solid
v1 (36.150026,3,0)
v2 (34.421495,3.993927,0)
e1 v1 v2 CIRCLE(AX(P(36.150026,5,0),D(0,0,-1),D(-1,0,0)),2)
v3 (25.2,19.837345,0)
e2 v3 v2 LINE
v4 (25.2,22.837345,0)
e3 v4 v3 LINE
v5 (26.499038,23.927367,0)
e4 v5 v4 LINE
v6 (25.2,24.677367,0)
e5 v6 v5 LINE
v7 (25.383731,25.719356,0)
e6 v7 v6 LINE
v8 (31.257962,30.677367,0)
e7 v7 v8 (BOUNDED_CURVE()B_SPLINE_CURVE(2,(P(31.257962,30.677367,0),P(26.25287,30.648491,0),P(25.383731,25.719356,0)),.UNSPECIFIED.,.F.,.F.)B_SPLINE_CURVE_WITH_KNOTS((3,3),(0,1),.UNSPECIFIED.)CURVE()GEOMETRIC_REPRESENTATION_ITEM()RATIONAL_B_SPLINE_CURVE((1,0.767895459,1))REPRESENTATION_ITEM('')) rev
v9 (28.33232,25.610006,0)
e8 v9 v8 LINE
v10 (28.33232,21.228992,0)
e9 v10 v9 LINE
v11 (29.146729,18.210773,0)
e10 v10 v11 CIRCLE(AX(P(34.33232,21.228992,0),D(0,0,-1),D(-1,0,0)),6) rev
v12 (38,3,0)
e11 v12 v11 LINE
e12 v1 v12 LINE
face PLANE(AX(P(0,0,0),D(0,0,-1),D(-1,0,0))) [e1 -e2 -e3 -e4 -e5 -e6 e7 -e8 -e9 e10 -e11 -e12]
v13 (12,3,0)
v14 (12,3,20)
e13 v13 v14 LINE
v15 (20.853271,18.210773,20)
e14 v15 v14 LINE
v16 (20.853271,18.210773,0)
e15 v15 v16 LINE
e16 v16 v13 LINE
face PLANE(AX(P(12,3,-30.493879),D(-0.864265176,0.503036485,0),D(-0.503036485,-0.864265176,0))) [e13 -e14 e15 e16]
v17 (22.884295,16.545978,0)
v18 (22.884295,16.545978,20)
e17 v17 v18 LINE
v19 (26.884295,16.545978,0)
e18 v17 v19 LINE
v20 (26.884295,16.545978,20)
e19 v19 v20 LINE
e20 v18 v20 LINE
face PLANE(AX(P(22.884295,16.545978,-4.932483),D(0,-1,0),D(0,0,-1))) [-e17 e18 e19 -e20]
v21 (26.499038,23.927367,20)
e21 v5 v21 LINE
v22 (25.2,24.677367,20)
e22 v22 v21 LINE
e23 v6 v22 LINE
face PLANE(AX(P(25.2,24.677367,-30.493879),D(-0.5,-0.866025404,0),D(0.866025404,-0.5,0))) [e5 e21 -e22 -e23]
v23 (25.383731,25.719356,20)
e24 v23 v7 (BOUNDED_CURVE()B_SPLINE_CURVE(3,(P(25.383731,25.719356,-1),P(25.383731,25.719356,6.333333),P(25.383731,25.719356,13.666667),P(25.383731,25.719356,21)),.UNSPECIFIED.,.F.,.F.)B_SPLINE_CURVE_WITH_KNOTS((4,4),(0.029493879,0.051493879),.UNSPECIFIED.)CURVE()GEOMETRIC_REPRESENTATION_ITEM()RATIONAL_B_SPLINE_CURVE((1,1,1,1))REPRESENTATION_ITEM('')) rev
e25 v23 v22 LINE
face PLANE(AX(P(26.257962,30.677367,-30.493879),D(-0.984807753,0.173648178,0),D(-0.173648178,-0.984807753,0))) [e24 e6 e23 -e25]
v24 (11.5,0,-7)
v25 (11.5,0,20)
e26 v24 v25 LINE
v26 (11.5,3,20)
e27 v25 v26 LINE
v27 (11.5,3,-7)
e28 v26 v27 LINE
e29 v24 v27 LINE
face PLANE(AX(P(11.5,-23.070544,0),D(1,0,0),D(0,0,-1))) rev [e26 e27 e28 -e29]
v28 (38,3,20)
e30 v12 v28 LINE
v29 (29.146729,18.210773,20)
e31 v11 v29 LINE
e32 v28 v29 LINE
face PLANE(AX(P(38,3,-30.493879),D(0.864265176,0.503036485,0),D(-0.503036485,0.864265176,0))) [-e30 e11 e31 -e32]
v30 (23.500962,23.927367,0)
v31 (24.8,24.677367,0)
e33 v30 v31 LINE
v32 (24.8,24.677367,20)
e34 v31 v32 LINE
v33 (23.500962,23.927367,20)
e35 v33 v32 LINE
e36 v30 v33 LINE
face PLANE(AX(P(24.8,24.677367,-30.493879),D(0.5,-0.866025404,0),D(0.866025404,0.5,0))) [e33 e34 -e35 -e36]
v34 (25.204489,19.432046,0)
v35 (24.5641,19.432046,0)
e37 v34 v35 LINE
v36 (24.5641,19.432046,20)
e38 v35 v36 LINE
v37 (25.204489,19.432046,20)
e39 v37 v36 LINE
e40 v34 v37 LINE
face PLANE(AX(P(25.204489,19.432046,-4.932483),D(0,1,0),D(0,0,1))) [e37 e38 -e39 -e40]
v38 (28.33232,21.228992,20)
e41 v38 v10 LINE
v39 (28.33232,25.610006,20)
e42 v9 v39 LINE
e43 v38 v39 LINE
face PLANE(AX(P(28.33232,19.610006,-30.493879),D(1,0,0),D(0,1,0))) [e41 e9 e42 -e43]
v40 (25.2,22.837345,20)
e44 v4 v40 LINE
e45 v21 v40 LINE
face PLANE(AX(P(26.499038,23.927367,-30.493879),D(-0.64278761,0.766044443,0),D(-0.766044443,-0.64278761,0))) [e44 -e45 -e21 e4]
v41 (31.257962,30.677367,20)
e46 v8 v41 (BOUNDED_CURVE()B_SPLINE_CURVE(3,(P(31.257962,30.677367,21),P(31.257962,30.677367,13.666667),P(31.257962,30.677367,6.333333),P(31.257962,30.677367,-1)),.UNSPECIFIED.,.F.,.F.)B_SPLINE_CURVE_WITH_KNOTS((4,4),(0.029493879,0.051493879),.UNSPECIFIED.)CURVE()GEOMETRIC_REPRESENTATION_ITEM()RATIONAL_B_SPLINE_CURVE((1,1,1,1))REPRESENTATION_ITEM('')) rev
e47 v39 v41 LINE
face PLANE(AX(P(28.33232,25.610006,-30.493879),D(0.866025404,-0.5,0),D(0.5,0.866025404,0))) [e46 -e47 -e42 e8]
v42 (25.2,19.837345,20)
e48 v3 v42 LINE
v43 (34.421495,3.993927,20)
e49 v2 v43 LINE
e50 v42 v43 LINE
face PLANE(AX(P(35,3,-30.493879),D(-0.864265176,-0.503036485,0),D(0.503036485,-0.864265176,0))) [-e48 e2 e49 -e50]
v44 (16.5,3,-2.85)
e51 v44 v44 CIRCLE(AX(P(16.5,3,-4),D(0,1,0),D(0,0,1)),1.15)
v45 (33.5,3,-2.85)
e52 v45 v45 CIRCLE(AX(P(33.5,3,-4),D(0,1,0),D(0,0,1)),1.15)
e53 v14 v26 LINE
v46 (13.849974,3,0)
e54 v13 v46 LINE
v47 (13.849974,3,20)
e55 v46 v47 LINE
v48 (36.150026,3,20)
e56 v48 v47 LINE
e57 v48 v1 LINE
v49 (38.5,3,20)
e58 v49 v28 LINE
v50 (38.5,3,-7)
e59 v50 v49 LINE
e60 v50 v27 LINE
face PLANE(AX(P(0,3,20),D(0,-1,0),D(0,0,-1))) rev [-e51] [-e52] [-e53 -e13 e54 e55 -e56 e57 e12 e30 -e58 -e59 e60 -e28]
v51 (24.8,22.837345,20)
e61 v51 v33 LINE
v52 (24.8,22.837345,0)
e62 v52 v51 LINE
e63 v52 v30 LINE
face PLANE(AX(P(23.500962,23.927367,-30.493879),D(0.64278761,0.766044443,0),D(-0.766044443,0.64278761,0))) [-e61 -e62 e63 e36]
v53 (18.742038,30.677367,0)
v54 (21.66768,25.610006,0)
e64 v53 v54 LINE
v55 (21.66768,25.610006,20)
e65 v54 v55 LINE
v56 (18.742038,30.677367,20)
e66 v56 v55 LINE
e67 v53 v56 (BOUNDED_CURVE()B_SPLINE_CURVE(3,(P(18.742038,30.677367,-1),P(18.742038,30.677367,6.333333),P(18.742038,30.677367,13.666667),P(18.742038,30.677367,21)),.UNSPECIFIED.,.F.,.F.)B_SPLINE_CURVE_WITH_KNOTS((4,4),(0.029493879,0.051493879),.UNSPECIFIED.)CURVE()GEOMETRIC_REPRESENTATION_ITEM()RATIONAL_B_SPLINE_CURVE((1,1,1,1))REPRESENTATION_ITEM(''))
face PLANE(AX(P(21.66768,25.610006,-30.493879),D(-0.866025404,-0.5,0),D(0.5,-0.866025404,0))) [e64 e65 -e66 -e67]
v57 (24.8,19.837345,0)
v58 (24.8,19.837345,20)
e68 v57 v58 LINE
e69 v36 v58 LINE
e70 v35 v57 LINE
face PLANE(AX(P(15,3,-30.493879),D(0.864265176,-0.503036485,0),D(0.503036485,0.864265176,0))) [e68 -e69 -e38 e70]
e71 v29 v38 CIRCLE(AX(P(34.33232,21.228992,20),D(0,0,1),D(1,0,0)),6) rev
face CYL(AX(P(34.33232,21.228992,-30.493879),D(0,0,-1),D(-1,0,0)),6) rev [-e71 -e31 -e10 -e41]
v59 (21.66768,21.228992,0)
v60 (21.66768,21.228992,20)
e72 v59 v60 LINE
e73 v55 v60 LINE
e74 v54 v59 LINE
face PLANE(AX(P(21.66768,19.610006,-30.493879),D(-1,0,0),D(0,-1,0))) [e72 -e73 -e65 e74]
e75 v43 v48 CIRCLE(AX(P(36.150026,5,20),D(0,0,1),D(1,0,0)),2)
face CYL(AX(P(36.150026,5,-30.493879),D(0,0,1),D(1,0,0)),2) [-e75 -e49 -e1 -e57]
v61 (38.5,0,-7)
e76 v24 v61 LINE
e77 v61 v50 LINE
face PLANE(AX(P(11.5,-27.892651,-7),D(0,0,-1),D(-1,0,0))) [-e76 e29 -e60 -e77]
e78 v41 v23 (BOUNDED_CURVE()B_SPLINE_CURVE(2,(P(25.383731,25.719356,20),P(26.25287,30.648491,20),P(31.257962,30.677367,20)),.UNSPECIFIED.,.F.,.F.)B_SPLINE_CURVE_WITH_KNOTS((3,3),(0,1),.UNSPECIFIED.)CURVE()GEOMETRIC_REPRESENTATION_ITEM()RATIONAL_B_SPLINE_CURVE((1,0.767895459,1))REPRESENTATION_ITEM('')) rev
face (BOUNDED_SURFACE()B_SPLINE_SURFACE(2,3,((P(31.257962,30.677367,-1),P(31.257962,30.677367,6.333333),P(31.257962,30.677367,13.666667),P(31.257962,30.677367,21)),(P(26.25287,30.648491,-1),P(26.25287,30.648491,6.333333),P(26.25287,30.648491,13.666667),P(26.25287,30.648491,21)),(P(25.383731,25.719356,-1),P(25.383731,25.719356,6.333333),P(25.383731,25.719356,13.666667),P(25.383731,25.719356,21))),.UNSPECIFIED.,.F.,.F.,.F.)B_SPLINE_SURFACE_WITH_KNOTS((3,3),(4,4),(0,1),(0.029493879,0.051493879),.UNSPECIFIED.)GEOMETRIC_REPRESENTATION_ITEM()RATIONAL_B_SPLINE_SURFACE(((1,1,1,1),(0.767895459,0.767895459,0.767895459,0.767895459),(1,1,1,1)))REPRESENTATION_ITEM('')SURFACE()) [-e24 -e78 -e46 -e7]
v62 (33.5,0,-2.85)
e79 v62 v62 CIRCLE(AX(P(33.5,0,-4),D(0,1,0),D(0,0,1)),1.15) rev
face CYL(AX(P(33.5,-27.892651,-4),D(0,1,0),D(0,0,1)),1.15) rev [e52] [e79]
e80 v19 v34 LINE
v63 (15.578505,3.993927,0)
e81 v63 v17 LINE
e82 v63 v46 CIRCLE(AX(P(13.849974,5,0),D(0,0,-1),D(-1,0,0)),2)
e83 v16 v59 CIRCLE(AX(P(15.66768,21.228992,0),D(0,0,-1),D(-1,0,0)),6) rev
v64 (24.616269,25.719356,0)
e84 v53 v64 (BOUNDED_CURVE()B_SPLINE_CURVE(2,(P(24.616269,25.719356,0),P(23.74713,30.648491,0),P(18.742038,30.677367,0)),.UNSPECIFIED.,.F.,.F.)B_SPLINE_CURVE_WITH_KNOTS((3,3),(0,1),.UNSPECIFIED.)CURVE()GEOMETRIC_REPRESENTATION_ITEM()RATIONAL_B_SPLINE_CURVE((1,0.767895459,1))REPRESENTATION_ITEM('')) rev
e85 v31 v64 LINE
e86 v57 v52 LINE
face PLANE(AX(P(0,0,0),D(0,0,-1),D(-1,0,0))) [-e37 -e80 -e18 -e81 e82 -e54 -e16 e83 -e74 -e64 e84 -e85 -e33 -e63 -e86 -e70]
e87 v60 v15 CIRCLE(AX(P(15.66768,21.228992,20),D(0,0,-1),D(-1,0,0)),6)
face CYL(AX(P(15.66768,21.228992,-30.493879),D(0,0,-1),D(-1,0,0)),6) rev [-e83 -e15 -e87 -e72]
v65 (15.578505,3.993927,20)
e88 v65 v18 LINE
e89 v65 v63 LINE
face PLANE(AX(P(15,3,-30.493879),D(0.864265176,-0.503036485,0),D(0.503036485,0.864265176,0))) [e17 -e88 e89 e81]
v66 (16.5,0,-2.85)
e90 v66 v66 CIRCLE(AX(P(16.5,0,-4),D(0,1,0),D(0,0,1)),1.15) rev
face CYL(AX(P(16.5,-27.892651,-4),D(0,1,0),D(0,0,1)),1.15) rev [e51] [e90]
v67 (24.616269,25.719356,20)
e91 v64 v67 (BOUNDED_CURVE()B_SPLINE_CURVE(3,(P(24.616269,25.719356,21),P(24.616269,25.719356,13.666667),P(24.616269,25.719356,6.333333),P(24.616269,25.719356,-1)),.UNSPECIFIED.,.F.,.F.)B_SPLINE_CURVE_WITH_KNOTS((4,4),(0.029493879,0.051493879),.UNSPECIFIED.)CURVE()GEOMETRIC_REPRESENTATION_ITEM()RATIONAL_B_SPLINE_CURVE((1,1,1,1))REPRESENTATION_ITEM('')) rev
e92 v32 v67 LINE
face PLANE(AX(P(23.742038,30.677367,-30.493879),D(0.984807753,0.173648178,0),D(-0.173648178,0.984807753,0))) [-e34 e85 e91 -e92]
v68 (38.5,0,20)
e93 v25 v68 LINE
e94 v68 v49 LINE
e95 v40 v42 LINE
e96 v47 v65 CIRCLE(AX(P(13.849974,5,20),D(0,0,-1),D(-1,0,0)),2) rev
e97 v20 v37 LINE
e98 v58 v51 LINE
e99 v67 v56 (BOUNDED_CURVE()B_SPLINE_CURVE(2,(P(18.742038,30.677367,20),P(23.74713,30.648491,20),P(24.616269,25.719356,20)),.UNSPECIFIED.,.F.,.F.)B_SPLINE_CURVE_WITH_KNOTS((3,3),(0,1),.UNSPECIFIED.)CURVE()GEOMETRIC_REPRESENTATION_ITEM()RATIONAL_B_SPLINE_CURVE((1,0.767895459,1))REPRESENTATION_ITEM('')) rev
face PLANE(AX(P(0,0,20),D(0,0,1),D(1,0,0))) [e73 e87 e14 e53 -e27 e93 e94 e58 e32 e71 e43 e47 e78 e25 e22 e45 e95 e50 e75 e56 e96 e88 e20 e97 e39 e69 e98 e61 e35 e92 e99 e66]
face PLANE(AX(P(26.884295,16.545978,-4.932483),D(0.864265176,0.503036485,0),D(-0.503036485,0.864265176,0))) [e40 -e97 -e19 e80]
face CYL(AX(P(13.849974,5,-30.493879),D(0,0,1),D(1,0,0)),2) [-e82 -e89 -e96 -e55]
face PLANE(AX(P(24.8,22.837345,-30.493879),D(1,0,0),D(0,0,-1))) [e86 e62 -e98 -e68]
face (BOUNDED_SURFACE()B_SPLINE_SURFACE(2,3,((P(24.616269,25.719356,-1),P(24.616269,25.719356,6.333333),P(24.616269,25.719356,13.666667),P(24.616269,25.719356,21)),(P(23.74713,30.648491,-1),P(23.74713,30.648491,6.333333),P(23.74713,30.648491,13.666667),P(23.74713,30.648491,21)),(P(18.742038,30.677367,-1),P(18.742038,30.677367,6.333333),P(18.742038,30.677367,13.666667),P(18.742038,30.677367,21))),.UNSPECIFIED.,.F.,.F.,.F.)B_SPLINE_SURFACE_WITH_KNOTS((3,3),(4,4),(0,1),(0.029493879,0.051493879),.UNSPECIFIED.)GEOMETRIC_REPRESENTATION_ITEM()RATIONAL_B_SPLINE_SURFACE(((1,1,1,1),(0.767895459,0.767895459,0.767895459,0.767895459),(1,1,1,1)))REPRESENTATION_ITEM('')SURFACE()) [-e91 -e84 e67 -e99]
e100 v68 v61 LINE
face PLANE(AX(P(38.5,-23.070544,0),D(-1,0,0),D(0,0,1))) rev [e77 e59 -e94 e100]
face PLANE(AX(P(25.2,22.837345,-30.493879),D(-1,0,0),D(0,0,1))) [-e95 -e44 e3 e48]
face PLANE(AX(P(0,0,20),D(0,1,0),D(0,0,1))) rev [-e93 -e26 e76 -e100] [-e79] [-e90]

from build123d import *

# Parameters (mm, degrees)
SCHIZZO1_W                     = 50
SCHIZZO1_H                     = 3
ESTRUSIONE_ESTRUSIONE1_DEPTH   = 20
ESTRUSIONE_ESTRUSIONE2_DEPTH   = 20
ESTRUSIONE_ESTRUSIONE2_2_DEPTH = 20
RACCORDO2_R                    = 6
RACCORDO3_DEPTH                = 20
RACCORDO4_R                    = 6
RACCORDO5_R                    = 6
RACCORDO7_R                    = 2
RACCORDO8_R                    = 2
SCHIZZO5_W                     = 11.5
SCHIZZO5_H                     = 20
TAGLIO_ESTRUSIONE2_DEPTH       = 3
ESTRUSIONE_ESTRUSIONE7_DEPTH   = 20
SCHIZZO12_W                    = 27
SCHIZZO12_H                    = 7
SCHIZZO12_R                    = 1.15
ESTRUSIONE_ESTRUSIONE9_DEPTH   = 3


with BuildPart() as part:
    # Schizzo1 → Estrusione-Estrusione1 (new body)
    with BuildSketch(Plane.XY):
        with Locations((25, 1.5)):
            Rectangle(SCHIZZO1_W, SCHIZZO1_H)
    extrude(amount=ESTRUSIONE_ESTRUSIONE1_DEPTH)

    # Schizzo5 → Taglio-Estrusione2 (cut)
    with BuildSketch(Plane(origin=(0, 3, 0), x_dir=(1, 0, 0), z_dir=(0, 1, 0))):
        with Locations((5.75, -10)):
            Rectangle(SCHIZZO5_W, SCHIZZO5_H)
        with Locations((44.25, -10)):
            Rectangle(SCHIZZO5_W, SCHIZZO5_H)
    extrude(amount=-TAGLIO_ESTRUSIONE2_DEPTH, mode=Mode.SUBTRACT)



with BuildPart() as body_2:
    # Schizzo2 → Estrusione-Estrusione2 (new body)
    with BuildSketch(Plane.XY.offset(20)):
        Polygon((12, 3), (21.667680152, 19.610006491), (21.667680152, 25.610006491), (18.742038116, 30.677367142), (23.742038116, 30.677367142), (24.8, 24.677367142), (23.500961894, 23.927367142), (24.8, 22.837344747), (24.8, 19.837344747), (15, 3), align=None)
    extrude(amount=-ESTRUSIONE_ESTRUSIONE2_DEPTH)

    # Raccordo2
    # the kernel refuses this fillet: 6 mm, written as the material it takes off along each edge
    with BuildSketch(Plane(origin=(23.742038116, 30.677367142, 32.586494468), x_dir=(-1, 0, 0), z_dir=(0, 0, -1))) as raccordo2_piece_1:
        with BuildLine():
            CenterArc((RACCORDO2_R * 0.839099631177, -RACCORDO2_R), RACCORDO2_R, 90, 80)
            Line((-RACCORDO2_R * 0.145708121835, -RACCORDO2_R * 0.826351822333), (0, 0))
            Line((0, 0), (RACCORDO2_R * 0.839099631177, 0))
        make_face()
    extrude(amount=45.172988935, mode=Mode.SUBTRACT)

    # Raccordo5
    raccordo5_edges = [body_2.edges().sort_by_distance(p)[0] for p in [
        (21.667680152, 19.610006491, 10),
    ]]
    fillet(raccordo5_edges, radius=RACCORDO5_R)

    # Raccordo8
    raccordo8_edges = [body_2.edges().sort_by_distance(p)[0] for p in [
        (15, 3, 10),
    ]]
    fillet(raccordo8_edges, radius=RACCORDO8_R)

    # Schizzo9 → Estrusione-Estrusione7 (add)
    with BuildSketch(Plane.XY.offset(20)):
        Polygon((24.564100135, 19.432046037), (22.884294771, 16.545978484), (26.884294771, 16.545978484), (25.204489408, 19.432046037), align=None)
    extrude(amount=-ESTRUSIONE_ESTRUSIONE7_DEPTH)


with BuildPart() as body_3:
    # Schizzo2 → Estrusione-Estrusione2 2 (new body)
    with BuildSketch(Plane.XY.offset(20)):
        Polygon((26.499038106, 23.927367142), (25.2, 22.837344747), (25.2, 19.837344747), (35, 3), (38, 3), (28.332319848, 19.610006491), (28.332319848, 25.610006491), (31.257961884, 30.677367142), (26.257961884, 30.677367142), (25.2, 24.677367142), align=None)
    extrude(amount=-ESTRUSIONE_ESTRUSIONE2_2_DEPTH)

    # Raccordo3: read off the stored shape, not the designer's step
    # Raccordo3 outline → Raccordo3 (cut)
    with BuildSketch(Plane.XY):
        with BuildLine():
            add(Edge.make_bspline(
                [(31.257961884, 30.677367142), (26.252870263, 30.648491125), (25.38373076, 25.719356061)],
                knots=[0, 0, 0, 1, 1, 1], degree=2, weights=[1, 0.767895459, 1]))
            Line((31.257961884, 30.677367142), (26.257961884, 30.677367142))
            Line((26.257961884, 30.677367142), (25.38373076, 25.719356061))
        make_face()
    extrude(amount=RACCORDO3_DEPTH, mode=Mode.SUBTRACT)

    # Raccordo4
    raccordo4_edges = [body_3.edges().sort_by_distance(p)[0] for p in [
        (28.332319848, 19.610006491, 10),
    ]]
    fillet(raccordo4_edges, radius=RACCORDO4_R)

    # Raccordo7
    raccordo7_edges = [body_3.edges().sort_by_distance(p)[0] for p in [
        (35, 3, 10),
    ]]
    fillet(raccordo7_edges, radius=RACCORDO7_R)


with BuildPart() as part_1:
    add(part.part)

    add(body_2.part)  # Estrusione-Estrusione9 merges body 2

    add(body_3.part)  # Estrusione-Estrusione9 merges body 3
    # Schizzo12 → Estrusione-Estrusione9 (add)
    with BuildSketch(Plane(origin=(0, 3, 0), x_dir=(1, 0, 0), z_dir=(0, 1, 0))):
        with Locations((25, 3.5)):
            Rectangle(SCHIZZO12_W, SCHIZZO12_H)
        with Locations(Location((16.5, 4, 0), (0, 0, 270))):
            Circle(SCHIZZO12_R, mode=Mode.SUBTRACT)
        with Locations(Location((33.5, 4, 0), (0, 0, 270))):
            Circle(SCHIZZO12_R, mode=Mode.SUBTRACT)
    extrude(amount=-ESTRUSIONE_ESTRUSIONE9_DEPTH)


solid = part_1.part
